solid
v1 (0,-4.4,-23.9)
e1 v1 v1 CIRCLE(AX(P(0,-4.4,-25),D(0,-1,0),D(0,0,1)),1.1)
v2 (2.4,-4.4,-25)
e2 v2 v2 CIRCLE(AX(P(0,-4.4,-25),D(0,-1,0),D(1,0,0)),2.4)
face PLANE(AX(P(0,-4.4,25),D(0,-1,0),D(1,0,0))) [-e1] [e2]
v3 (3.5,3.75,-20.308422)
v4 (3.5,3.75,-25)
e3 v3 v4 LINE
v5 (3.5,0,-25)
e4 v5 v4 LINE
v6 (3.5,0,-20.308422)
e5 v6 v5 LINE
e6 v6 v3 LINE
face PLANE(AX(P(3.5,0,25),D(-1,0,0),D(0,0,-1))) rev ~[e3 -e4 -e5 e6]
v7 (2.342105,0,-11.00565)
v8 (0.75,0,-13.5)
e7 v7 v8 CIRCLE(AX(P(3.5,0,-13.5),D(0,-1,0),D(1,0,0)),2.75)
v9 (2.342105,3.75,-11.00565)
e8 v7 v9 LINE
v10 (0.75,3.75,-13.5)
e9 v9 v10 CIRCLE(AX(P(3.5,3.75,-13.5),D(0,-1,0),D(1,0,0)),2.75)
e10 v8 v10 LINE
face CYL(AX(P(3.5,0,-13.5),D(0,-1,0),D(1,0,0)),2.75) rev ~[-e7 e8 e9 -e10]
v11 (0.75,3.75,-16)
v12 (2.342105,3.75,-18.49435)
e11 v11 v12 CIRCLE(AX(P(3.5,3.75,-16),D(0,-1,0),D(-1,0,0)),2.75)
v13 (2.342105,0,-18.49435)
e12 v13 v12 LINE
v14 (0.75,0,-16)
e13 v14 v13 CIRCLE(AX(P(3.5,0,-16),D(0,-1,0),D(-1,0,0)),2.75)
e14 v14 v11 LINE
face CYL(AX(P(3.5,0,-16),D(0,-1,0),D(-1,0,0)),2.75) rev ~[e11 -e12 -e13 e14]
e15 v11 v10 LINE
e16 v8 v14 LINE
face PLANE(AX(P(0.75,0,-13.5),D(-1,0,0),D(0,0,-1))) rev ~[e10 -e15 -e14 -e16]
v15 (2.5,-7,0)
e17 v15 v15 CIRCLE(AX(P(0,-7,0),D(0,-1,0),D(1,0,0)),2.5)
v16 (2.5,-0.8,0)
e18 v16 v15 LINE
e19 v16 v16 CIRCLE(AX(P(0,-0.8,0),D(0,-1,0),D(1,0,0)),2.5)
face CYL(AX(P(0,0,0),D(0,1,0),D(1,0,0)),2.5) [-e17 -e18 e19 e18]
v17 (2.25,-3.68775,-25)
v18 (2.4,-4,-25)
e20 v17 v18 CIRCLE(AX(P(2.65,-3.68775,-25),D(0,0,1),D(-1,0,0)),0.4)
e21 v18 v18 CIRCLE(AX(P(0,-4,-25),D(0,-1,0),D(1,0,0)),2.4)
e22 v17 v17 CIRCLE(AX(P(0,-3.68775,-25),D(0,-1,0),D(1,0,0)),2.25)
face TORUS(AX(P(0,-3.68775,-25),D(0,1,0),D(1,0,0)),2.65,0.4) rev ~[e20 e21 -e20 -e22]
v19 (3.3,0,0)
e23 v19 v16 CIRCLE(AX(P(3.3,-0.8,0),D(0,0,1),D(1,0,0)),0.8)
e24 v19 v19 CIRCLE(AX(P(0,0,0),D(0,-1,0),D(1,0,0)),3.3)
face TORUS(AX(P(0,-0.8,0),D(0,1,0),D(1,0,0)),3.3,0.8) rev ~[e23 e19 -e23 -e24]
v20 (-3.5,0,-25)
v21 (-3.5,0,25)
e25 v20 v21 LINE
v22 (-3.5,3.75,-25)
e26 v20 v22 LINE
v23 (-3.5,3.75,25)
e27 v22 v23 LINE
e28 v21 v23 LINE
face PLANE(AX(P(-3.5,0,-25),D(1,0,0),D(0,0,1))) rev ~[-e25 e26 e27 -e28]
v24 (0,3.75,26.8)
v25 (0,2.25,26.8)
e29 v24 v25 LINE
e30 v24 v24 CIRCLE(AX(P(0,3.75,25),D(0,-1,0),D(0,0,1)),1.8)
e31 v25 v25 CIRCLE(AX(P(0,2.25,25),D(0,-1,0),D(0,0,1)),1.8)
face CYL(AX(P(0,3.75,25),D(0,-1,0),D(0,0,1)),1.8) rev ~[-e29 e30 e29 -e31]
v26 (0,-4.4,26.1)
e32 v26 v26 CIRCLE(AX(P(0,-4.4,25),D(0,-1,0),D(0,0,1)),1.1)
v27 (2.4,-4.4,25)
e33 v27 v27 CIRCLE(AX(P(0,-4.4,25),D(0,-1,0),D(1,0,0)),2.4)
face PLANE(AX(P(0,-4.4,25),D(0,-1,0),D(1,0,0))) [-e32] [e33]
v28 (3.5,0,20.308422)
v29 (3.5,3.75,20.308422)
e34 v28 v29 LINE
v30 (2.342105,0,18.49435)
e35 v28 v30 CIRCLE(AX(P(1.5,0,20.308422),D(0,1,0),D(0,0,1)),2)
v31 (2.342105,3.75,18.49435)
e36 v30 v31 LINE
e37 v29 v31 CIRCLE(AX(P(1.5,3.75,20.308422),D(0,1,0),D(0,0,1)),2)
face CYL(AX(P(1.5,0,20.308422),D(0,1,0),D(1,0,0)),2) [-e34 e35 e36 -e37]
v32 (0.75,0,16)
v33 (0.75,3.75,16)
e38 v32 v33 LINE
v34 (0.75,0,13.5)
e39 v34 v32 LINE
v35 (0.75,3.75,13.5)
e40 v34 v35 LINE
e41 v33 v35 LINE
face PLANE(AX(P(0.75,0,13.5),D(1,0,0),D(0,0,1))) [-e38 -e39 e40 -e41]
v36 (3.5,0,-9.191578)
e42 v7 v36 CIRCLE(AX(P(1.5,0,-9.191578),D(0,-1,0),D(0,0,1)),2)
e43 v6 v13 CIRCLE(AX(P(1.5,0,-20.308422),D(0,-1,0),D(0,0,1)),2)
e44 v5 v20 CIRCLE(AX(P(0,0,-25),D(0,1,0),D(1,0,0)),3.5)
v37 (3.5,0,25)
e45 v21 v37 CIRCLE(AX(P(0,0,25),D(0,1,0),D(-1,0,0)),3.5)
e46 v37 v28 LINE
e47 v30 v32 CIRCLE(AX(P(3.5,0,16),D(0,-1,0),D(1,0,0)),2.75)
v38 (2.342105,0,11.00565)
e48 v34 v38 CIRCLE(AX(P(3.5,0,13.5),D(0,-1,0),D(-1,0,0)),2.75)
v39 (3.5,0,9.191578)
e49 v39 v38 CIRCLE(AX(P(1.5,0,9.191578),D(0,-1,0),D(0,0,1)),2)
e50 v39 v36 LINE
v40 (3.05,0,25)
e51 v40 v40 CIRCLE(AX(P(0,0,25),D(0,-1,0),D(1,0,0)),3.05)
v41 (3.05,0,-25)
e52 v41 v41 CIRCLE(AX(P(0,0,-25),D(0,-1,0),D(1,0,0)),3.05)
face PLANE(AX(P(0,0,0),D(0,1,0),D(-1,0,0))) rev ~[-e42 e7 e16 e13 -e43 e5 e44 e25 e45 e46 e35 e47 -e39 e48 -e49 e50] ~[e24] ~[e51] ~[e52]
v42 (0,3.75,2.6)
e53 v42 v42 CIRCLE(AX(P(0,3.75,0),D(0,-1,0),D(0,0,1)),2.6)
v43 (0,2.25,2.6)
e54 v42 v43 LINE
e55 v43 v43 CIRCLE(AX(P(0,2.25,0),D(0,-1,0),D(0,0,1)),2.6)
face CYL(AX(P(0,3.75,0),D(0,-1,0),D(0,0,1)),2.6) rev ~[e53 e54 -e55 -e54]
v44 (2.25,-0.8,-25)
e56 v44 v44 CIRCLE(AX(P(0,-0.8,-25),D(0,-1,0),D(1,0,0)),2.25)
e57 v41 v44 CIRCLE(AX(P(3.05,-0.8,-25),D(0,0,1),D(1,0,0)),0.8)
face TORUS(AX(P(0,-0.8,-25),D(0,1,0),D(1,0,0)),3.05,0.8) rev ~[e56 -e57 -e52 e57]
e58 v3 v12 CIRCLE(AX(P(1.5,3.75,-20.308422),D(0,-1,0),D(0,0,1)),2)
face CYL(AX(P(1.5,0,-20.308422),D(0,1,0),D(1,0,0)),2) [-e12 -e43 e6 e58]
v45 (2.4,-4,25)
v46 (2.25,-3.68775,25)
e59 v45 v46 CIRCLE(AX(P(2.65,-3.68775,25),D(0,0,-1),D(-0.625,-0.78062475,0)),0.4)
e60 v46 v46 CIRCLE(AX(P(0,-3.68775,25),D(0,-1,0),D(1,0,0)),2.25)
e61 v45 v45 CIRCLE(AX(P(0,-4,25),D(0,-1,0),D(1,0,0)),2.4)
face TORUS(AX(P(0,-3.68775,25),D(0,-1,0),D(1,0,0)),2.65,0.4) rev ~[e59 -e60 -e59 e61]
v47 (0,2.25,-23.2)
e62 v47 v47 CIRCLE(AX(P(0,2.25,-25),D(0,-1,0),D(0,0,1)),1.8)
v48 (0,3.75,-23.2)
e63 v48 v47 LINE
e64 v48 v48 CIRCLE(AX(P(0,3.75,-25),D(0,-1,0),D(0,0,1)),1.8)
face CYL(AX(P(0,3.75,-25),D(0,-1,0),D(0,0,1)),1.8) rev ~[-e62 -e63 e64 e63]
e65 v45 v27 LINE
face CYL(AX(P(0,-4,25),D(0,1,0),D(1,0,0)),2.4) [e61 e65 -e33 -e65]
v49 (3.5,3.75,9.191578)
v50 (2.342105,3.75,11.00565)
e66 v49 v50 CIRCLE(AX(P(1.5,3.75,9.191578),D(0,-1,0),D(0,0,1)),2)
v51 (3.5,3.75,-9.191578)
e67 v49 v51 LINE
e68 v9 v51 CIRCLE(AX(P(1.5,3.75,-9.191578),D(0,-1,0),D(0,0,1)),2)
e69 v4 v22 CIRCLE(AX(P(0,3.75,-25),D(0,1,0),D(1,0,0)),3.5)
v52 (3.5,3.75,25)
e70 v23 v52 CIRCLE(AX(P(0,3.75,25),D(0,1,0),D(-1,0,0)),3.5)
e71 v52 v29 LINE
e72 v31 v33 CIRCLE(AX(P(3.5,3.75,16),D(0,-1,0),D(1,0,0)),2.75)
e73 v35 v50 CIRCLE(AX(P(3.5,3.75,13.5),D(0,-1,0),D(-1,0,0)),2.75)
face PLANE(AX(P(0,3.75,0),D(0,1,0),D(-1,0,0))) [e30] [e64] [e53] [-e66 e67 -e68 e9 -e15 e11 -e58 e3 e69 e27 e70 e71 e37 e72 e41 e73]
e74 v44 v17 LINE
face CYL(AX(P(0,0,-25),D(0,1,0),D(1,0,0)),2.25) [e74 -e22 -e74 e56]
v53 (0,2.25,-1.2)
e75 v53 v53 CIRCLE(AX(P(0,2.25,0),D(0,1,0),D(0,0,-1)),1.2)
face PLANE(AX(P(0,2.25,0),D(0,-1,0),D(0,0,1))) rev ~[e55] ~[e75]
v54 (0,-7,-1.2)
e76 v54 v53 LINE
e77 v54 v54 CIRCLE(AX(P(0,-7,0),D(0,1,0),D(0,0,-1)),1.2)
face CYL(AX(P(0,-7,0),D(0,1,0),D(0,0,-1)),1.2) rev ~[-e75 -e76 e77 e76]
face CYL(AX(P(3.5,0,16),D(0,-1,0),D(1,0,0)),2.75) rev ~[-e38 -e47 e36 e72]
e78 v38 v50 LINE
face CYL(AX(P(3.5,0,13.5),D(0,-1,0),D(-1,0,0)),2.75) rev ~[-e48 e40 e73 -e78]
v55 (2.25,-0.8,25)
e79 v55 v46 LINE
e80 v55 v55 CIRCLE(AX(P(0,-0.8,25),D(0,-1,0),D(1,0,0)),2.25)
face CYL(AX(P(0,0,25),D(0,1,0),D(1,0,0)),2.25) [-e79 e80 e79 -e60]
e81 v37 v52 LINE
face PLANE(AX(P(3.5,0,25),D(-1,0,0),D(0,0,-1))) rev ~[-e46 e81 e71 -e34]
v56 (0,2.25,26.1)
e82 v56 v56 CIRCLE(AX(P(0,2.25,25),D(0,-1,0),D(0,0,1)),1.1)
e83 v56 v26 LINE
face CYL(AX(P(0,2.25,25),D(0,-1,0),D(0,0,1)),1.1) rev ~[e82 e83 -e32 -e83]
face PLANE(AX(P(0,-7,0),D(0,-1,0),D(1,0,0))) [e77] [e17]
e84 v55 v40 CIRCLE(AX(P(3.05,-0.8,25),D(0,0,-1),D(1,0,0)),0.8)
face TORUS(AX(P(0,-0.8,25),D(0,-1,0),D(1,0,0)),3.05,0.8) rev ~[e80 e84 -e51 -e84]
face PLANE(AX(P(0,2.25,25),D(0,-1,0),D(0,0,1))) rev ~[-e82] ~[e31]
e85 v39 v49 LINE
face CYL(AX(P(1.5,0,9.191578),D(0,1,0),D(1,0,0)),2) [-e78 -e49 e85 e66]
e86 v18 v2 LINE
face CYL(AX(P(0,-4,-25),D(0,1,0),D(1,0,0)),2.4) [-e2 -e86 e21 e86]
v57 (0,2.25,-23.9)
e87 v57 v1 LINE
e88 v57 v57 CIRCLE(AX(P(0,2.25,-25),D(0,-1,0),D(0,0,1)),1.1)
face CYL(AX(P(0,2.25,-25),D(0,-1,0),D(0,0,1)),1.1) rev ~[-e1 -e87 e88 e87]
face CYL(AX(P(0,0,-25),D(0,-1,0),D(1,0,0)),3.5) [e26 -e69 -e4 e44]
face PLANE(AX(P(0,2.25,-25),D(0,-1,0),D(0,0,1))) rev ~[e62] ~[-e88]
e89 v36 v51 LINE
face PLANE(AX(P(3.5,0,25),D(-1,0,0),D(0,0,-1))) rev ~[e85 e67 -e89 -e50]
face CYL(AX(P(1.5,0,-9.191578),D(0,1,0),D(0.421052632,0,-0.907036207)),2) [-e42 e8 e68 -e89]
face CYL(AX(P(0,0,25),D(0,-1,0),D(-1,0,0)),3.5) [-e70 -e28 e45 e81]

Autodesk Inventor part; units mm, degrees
ref_plane "YZ Plane" through (0, 0, 0) normal (1, 0, 0) x (0, 1, 0)
ref_plane "XZ Plane" through (0, 0, 0) normal (0, 1, 0) x (-1, 0, 0)
ref_plane "XY Plane" through (0, 0, 0) normal (0, 0, 1) x (1, 0, 0)
sketch "Sketch1" plane through (0, 0, 0) normal (0, 1, 0) x (-1, 0, 0)
  line L0 (0, 25) -> (0, -25) construction
  line L1 (-3.5, 25) -> (-3.5, -25)
  line L2 (3.5, -25) -> (3.5, 25)
  arc A0 (3.5, 25) -> (-3.5, 25) centre (0, 25) ccw
  arc A1 (-3.5, -25) -> (3.5, -25) centre (0, -25) ccw
  point P0 (0, 0)
  point P1 (0, 0)
  dimension "d0" = 50
  dimension "d1" = 7
extrude "Extrusion1" add sketch "Sketch1" along normal blind 3.75
sketch "Sketch2" plane through (0, 3.75, 0) normal (0, 1, 0) x (1, 0, 0)
  arc A0 (3.5, 25) -> (-3.5, 25) centre (0, 25) ccw projected
  line L0 (-3.5, 25) -> (-3.5, -25) projected
  arc A1 (-3.5, -25) -> (3.5, -25) centre (0, -25) ccw projected
  line L1 (3.5, -25) -> (3.5, 25) projected
  circle A2 centre (0, 25) radius 1.5
  circle A3 centre (0, -25) radius 1.5
  arc A4 (-3.5, -25) -> (3.5, -25) centre (0, -25) ccw projected
  point P0 (0, 0)
  dimension "d38" = 3
  dimension "d39" = 3
sketch "Sketch3" plane through (0, 0, 0) normal (0, -1, 0) x (1, 0, 0)
  arc A0 (-3.5, -25) -> (3.5, -25) centre (0, -25) ccw projected
  line L0 (3.5, 25) -> (3.5, -25) projected
  arc A1 (3.5, 25) -> (-3.5, 25) centre (0, 25) ccw projected
  line L1 (-3.5, -25) -> (-3.5, 25) projected
  circle A2 centre (0, 0) radius 2.5
  circle A3 centre (0, 0) radius 1.2
  dimension "d11" = 5
  dimension "d14" = 2.4
extrude "Extrusion2" add sketch "Sketch3" along normal blind 7 contours A2 | A3
sketch "Sketch5" plane through (0, -7, 0) normal (0, -1, 0) x (1, 0, 0)
  point P0 (0, 0)
  point P1 (0, 0)
hole "Hole2" at (0, -7, 0) direction (0, 1, 0) diameter 2.4 depth 10 tip angle 118
sketch "Sketch6" plane through (0, 3.75, 0) normal (0, 1, 0) x (1, 0, 0)
  point P0 (0, 0)
  point P1 (0, 0)
hole "Hole3" at (0, 3.75, 0) direction (0, -1, 0) diameter 5.2 depth 1.5
sketch "Sketch8" plane through (0, 0, 0) normal (0, -1, 0) x (1, 0, 0)
  circle A0 centre (0, 0) radius 2.5 projected
  arc A1 (-3.5, -25) -> (3.5, -25) centre (0, -25) ccw projected
  line L0 (3.5, 25) -> (3.5, -25) projected
  arc A2 (3.5, 25) -> (-3.5, 25) centre (0, 25) ccw projected
  line L1 (-3.5, -25) -> (-3.5, 25) projected
  line L2 (3.5, 25) -> (3.5, -25) projected
  line L3 (3.5, -13.5) -> (3.5, -16) construction
  line L4 (0.75, -13.5) -> (0.75, -16)
  line L5 (6.25, -16) -> (6.25, -13.5)
  arc A3 (6.25, -13.5) -> (0.75, -13.5) centre (3.5, -13.5) ccw
  arc A4 (0.75, -16) -> (6.25, -16) centre (3.5, -16) ccw
  line L6 (-5.2, 0) -> (6.7, 0) projected
  line L7 (3.5, 13.5) -> (3.5, 16) construction
  line L8 (0.75, 13.5) -> (0.75, 16)
  line L9 (6.25, 16) -> (6.25, 13.5)
  arc A5 (0.75, 13.5) -> (6.25, 13.5) centre (3.5, 13.5) ccw
  arc A6 (6.25, 16) -> (0.75, 16) centre (3.5, 16) ccw
  point P0 (3.5, -14.75)
  point P1 (3.5, -18.75)
  point P2 (3.5, -10.75)
  point P3 (3.5, 14.75)
  point P4 (3.5, 10.75)
  point P5 (3.5, 18.75)
  dimension "d32" = 2.5
  dimension "d33" = 5.5
  dimension "d71" = 13.5
extrude "Cut" cut sketch "Sketch8" against normal through all contours A5 L8 A6 L0 | L0 A4 L4 A3
fillet "Fillet1" radius 2 4 edges at (3.5, 1.875, -10.75) (3.5, 1.875, -18.75) (3.5, 1.875, 18.75) (3.5, 1.875, 10.75)
extrude "Extrusion5" [suppressed]
sketch "Sketch9" plane through (0, 9.55, -25) normal (0, 1, 0) x (1, 0, 0)
  circle A0 centre (0, 0) radius 1.5 projected
  circle A1 centre (0, -50) radius 1.5 projected
  circle A2 centre (0, -50) radius 1.5 projected
  circle A3 centre (0, -50) radius 1.85
  circle A4 centre (0, 0) radius 1.5 projected
  circle A5 centre (0, 0) radius 1.85
  point P0 (0, -25)
  dimension "d42" = 3.7
  dimension "d43" = 3.7
extrude "Extrusion6" [suppressed]
chamfer "Chamfer1" [suppressed]
fillet "Fillet2" [suppressed]
sketch "Sketch10" plane through (0, 0, 0) normal (0, -1, 0) x (1, 0, 0)
  arc A0 (3.5, 25) -> (-3.5, 25) centre (0, 25) ccw projected
  arc A1 (-3.5, -25) -> (3.5, -25) centre (0, -25) ccw projected
  circle A2 centre (0, 25) radius 2.25
  circle A3 centre (0, -25) radius 2.25
  point P0 (0, 0)
  dimension "d50" = 4.5
extrude "Extrusion7" add sketch "Sketch10" along normal blind 4
sketch "Sketch11" plane through (0, -4, 25) normal (0, -1, 0) x (1, 0, 0)
  circle A0 centre (0, 0) radius 2.25 projected
  circle A1 centre (0, -50) radius 2.25 projected
  circle A2 centre (0, 0) radius 2.4
  circle A3 centre (0, -50) radius 2.4
  point P0 (0, -25)
  dimension "d54" = 4.8
  dimension "d70" = 4.5
extrude "Extrusion8" add sketch "Sketch11" along normal blind 0.4 contours A0 | A1 | A2 | A3
fillet "Fillet3" radius 0.4 2 edges at (-2.25, -4, 25) (-2.25, -4, -25)
fillet "Fillet4" radius 0.8 3 edges at (-2.25, 0, 25) (-2.25, 0, -25) (-2.5, 0, 0)
sketch "Sketch13" plane through (0, 3.75, 0) normal (0, 1, 0) x (1, 0, 0)
  circle A0 centre (0, -25) radius 2.4 projected
  circle A1 centre (0, 25) radius 2.25 projected
  circle A2 centre (0, -25) radius 3.05 projected
  point P0 (0, 0)
hole "Hole4" at (0, 3.75, 25) at (0, 3.75, -25) direction (0, -1, 0) diameter 2.2 end through all counterbore diameter 3.6 counterbore depth 1.5
equation "\"d43\" = d42"
properties part number "ActuatorLink"
